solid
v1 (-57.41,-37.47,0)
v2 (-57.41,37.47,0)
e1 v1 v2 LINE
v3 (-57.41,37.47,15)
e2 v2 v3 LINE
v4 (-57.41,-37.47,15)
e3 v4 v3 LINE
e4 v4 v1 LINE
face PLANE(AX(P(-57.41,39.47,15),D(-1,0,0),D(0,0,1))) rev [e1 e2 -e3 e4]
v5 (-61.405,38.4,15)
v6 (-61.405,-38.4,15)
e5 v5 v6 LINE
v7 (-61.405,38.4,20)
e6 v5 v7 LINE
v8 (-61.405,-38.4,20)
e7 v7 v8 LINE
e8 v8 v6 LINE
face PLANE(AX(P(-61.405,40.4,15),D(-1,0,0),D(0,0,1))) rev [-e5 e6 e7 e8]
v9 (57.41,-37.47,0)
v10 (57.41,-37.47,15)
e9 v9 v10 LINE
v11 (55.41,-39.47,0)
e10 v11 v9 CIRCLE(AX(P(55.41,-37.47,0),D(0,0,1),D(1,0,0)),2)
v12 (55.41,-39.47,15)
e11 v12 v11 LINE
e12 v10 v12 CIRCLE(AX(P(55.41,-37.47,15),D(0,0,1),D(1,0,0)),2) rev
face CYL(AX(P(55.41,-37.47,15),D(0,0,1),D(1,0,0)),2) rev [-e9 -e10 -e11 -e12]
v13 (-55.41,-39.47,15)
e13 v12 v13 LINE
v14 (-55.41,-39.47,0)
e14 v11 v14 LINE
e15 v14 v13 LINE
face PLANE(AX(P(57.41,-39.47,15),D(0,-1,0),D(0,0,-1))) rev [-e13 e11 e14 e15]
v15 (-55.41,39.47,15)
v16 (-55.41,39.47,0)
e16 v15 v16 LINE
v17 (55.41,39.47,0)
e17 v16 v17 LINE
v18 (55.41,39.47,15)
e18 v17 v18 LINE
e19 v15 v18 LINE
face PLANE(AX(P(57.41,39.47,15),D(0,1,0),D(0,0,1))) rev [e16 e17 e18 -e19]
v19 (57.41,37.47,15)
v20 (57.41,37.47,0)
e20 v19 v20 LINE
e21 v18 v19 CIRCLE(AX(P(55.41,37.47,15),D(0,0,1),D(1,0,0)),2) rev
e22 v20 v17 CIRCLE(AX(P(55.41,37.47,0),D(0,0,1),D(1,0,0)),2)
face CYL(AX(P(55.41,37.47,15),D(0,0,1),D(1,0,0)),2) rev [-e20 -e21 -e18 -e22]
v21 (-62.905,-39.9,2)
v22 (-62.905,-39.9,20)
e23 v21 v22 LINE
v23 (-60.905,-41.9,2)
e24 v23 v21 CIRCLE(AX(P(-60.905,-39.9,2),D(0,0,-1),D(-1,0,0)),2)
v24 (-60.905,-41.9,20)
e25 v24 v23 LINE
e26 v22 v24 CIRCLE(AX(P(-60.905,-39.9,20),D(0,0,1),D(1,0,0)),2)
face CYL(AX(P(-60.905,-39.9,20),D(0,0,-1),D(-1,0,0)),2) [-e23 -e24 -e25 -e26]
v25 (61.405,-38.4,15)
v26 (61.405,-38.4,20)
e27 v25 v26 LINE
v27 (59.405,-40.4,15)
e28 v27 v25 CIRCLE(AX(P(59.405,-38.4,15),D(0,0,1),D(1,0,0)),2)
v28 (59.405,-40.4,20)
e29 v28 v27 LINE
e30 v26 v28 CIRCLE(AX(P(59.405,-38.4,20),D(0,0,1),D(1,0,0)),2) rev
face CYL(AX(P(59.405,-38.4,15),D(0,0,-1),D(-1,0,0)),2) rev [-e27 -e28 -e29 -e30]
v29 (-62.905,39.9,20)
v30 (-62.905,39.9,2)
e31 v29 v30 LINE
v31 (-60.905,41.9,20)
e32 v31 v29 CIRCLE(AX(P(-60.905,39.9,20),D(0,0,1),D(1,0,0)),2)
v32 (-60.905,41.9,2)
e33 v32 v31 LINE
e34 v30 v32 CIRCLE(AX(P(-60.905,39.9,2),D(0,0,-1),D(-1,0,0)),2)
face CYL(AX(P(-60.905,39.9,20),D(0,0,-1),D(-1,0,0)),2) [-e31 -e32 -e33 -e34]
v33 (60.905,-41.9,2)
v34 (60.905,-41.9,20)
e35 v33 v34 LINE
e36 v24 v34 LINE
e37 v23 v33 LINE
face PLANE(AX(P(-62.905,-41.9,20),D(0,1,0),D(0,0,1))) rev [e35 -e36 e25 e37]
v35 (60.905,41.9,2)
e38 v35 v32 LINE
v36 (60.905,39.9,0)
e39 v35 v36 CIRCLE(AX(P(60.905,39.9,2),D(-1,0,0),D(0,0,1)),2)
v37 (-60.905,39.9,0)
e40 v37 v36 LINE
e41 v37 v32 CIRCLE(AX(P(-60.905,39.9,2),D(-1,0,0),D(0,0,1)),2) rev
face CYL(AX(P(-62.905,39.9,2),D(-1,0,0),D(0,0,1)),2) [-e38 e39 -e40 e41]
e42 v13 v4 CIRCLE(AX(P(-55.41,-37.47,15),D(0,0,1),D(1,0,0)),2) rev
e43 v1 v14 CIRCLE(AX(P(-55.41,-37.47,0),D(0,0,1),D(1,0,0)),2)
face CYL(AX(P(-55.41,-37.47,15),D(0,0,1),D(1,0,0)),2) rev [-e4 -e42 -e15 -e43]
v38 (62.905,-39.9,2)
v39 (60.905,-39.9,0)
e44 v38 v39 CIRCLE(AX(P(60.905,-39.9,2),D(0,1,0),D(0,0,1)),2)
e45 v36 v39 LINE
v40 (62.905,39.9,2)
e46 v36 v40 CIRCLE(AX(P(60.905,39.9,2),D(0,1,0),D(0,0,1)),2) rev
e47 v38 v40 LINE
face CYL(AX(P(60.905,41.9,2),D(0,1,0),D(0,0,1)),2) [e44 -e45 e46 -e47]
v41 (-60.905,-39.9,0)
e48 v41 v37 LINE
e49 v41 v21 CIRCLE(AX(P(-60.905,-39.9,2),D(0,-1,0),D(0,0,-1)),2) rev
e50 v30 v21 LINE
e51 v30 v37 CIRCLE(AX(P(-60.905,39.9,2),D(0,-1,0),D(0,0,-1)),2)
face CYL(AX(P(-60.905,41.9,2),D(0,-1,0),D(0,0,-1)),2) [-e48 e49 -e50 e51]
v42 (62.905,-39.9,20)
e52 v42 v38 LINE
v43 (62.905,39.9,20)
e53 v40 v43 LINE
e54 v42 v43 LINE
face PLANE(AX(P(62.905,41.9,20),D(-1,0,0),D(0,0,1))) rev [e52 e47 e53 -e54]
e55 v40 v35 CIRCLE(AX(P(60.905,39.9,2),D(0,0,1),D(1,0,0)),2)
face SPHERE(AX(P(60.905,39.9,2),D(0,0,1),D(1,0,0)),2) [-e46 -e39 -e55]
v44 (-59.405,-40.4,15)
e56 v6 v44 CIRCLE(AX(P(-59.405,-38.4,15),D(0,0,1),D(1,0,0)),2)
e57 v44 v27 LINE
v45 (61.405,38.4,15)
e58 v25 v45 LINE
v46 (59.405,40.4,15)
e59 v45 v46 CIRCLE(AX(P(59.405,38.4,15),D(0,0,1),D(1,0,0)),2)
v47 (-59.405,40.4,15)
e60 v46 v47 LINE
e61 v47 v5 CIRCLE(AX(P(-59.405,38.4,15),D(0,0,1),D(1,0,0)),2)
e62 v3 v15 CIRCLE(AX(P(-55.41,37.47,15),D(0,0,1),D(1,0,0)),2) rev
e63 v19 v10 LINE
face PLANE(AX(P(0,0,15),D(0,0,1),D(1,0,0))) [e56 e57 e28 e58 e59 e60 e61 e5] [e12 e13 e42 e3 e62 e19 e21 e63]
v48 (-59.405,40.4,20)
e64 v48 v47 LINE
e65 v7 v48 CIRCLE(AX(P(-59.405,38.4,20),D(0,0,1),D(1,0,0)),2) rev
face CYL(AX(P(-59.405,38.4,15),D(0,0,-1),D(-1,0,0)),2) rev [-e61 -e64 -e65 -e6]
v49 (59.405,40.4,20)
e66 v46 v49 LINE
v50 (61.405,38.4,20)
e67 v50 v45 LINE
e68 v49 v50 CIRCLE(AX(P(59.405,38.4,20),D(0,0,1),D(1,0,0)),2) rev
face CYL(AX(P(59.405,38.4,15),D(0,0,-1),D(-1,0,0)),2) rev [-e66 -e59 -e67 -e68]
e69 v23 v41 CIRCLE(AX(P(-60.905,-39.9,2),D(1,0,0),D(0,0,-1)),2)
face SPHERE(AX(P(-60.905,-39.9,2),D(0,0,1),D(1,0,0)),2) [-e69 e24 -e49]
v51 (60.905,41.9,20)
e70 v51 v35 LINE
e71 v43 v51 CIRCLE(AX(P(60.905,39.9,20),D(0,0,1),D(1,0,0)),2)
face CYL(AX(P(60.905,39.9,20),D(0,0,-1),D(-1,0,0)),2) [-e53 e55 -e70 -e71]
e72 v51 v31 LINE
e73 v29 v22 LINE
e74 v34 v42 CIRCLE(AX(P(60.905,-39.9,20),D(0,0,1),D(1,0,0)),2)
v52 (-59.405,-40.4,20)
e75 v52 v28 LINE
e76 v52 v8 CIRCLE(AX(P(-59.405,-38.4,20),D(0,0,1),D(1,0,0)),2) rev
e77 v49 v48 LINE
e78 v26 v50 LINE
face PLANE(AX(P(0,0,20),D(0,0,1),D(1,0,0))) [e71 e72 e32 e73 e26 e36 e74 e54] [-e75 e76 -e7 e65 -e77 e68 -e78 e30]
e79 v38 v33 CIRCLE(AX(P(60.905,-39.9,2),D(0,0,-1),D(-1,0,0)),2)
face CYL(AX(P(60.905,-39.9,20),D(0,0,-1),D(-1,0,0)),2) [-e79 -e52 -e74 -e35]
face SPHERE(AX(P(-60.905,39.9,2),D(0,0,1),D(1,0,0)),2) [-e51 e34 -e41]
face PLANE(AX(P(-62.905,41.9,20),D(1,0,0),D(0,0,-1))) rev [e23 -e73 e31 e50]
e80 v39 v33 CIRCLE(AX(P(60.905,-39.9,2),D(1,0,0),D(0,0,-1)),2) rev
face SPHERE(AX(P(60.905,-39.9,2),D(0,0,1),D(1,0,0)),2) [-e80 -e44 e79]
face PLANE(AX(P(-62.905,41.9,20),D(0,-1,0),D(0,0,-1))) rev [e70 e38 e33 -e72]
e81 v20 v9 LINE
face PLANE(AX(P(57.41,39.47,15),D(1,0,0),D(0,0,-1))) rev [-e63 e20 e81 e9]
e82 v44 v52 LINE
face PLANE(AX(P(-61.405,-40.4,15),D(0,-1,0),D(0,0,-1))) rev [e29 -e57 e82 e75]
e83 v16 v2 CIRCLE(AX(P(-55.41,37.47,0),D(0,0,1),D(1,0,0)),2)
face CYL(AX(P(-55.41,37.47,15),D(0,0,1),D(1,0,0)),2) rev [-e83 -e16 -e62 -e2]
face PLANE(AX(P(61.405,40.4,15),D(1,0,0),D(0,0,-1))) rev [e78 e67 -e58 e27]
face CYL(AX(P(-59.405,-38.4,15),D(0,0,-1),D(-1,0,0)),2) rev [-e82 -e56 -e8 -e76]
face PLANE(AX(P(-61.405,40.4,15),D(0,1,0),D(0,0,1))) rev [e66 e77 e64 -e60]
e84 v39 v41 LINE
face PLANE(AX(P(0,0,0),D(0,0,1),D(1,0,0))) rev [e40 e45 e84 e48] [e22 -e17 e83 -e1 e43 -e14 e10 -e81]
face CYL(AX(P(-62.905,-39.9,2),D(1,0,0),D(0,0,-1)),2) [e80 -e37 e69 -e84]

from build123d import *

# Parameters (mm, degrees)
SKETCH_3_W          = 125.81
SKETCH_3_H          = 83.8
EXTRUDE_2_DEPTH     = 20
SKETCH_5_W          = 122.81
SKETCH_5_H          = 80.8
CUT_EXTRUDE_1_DEPTH = 5
SKETCH_6_W          = 114.82
SKETCH_6_H          = 78.94
CUT_EXTRUDE_2_DEPTH = 15
FILLET_1_R          = 2
FILLET_2_R          = 2
FILLET_3_R          = 2


with BuildPart() as part:
    # 草图3 → 凸台-拉伸2 (new body)
    with BuildSketch(Plane.XY):
        Rectangle(SKETCH_3_W, SKETCH_3_H)
    extrude(amount=EXTRUDE_2_DEPTH)

    # 草图5 → 切除-拉伸1 (cut)
    with BuildSketch(Plane.XY.offset(20)):
        Rectangle(SKETCH_5_W, SKETCH_5_H)
    extrude(amount=-CUT_EXTRUDE_1_DEPTH, mode=Mode.SUBTRACT)

    # 草图6 → 切除-拉伸2 (cut)
    with BuildSketch(Plane(origin=(0, 0, 0), x_dir=(-1, 0, 0), z_dir=(0, 0, -1))):
        Rectangle(SKETCH_6_W, SKETCH_6_H)
    extrude(amount=-CUT_EXTRUDE_2_DEPTH, mode=Mode.SUBTRACT)

    # 圆角1
    fillet_1_edges = [part.edges().sort_by_distance(p)[0] for p in [
        (0, -41.9, 0),
        (-62.905, 0, 0),
        (0, 41.9, 0),
        (62.905, 0, 0),
    ]]
    fillet(fillet_1_edges, radius=FILLET_1_R)

    # 圆角2
    # the kernel refuses this fillet: 2 mm, written as the material it takes off along each edge
    with BuildSketch(Plane(origin=(60.905, -39.9, 2), x_dir=(0, -1, 0), z_dir=(1, 0, 0))) as fillet_2_piece_1_section:
        Polygon((0, 0), (FILLET_2_R, 0), (FILLET_2_R, FILLET_2_R), (0, FILLET_2_R), align=None)
    fillet_2_piece_1 = extrude(amount=FILLET_2_R, mode=Mode.PRIVATE)
    fillet_2_piece_1 = fillet_2_piece_1 - Plane(origin=(60.905, -39.9, 2), x_dir=(0, 0.7071067811865475, 0.7071067811865475), z_dir=(1, 0, 0)) * Sphere(FILLET_2_R, mode=Mode.PRIVATE)
    add(fillet_2_piece_1, mode=Mode.SUBTRACT)
    with BuildSketch(Plane(origin=(-60.905, -39.9, 2), x_dir=(0, -1, 0), z_dir=(-1, 0, 0))) as fillet_2_piece_2_section:
        Polygon((0, 0), (FILLET_2_R, 0), (FILLET_2_R, -FILLET_2_R), (0, -FILLET_2_R), align=None)
    fillet_2_piece_2 = extrude(amount=FILLET_2_R, mode=Mode.PRIVATE)
    fillet_2_piece_2 = fillet_2_piece_2 - Plane(origin=(-60.905, -39.9, 2), x_dir=(0, 0.7071067811865475, 0.7071067811865475), z_dir=(-1, 0, 0)) * Sphere(FILLET_2_R, mode=Mode.PRIVATE)
    add(fillet_2_piece_2, mode=Mode.SUBTRACT)
    with BuildSketch(Plane(origin=(60.905, 39.9, 2), x_dir=(1, 0, 0), z_dir=(0, 1, 0))) as fillet_2_piece_3_section:
        Polygon((0, 0), (FILLET_2_R, 0), (FILLET_2_R, FILLET_2_R), (0, FILLET_2_R), align=None)
    fillet_2_piece_3 = extrude(amount=FILLET_2_R, mode=Mode.PRIVATE)
    fillet_2_piece_3 = fillet_2_piece_3 - Plane(origin=(60.905, 39.9, 2), x_dir=(-0.7071067811865475, 0, 0.7071067811865475), z_dir=(0, 1, 0)) * Sphere(FILLET_2_R, mode=Mode.PRIVATE)
    add(fillet_2_piece_3, mode=Mode.SUBTRACT)
    with BuildSketch(Plane(origin=(-60.905, 39.9, 2), x_dir=(-1, 0, 0), z_dir=(0, 1, 0))) as fillet_2_piece_4_section:
        Polygon((0, 0), (FILLET_2_R, 0), (FILLET_2_R, -FILLET_2_R), (0, -FILLET_2_R), align=None)
    fillet_2_piece_4 = extrude(amount=FILLET_2_R, mode=Mode.PRIVATE)
    fillet_2_piece_4 = fillet_2_piece_4 - Plane(origin=(-60.905, 39.9, 2), x_dir=(0.7071067811865475, 0, 0.7071067811865475), z_dir=(0, 1, 0)) * Sphere(FILLET_2_R, mode=Mode.PRIVATE)
    add(fillet_2_piece_4, mode=Mode.SUBTRACT)
    with BuildSketch(Plane(origin=(62.905, -41.9, 2), x_dir=(0, 1, 0), z_dir=(0, 0, 1)), Plane(origin=(62.905, 41.9, 2), x_dir=(-1, 0, 0), z_dir=(0, 0, 1))) as fillet_2_piece_5:
        with BuildLine():
            CenterArc((FILLET_2_R, FILLET_2_R), FILLET_2_R, 180, 90)
            Line((0, FILLET_2_R), (0, 0))
            Line((0, 0), (FILLET_2_R, 0))
        make_face()
    extrude(amount=23, mode=Mode.SUBTRACT)
    with BuildSketch(Plane(origin=(-62.905, -41.9, 2), x_dir=(0, 1, 0), z_dir=(0, 0, 1)), Plane(origin=(-62.905, 41.9, 2), x_dir=(1, 0, 0), z_dir=(0, 0, 1))) as fillet_2_piece_6:
        with BuildLine():
            CenterArc((FILLET_2_R, -FILLET_2_R), FILLET_2_R, 90, 90)
            Line((0, -FILLET_2_R), (0, 0))
            Line((0, 0), (FILLET_2_R, 0))
        make_face()
    extrude(amount=23, mode=Mode.SUBTRACT)

    # 圆角3
    fillet_3_edges = [part.edges().sort_by_distance(p)[0] for p in [
        (61.405, 40.4, 17.5),
        (61.405, -40.4, 17.5),
        (-61.405, -40.4, 17.5),
        (-61.405, 40.4, 17.5),
        (-57.41, 39.47, 7.5),
        (-57.41, -39.47, 7.5),
        (57.41, -39.47, 7.5),
        (57.41, 39.47, 7.5),
    ]]
    fillet(fillet_3_edges, radius=FILLET_3_R)


solid = part.part
